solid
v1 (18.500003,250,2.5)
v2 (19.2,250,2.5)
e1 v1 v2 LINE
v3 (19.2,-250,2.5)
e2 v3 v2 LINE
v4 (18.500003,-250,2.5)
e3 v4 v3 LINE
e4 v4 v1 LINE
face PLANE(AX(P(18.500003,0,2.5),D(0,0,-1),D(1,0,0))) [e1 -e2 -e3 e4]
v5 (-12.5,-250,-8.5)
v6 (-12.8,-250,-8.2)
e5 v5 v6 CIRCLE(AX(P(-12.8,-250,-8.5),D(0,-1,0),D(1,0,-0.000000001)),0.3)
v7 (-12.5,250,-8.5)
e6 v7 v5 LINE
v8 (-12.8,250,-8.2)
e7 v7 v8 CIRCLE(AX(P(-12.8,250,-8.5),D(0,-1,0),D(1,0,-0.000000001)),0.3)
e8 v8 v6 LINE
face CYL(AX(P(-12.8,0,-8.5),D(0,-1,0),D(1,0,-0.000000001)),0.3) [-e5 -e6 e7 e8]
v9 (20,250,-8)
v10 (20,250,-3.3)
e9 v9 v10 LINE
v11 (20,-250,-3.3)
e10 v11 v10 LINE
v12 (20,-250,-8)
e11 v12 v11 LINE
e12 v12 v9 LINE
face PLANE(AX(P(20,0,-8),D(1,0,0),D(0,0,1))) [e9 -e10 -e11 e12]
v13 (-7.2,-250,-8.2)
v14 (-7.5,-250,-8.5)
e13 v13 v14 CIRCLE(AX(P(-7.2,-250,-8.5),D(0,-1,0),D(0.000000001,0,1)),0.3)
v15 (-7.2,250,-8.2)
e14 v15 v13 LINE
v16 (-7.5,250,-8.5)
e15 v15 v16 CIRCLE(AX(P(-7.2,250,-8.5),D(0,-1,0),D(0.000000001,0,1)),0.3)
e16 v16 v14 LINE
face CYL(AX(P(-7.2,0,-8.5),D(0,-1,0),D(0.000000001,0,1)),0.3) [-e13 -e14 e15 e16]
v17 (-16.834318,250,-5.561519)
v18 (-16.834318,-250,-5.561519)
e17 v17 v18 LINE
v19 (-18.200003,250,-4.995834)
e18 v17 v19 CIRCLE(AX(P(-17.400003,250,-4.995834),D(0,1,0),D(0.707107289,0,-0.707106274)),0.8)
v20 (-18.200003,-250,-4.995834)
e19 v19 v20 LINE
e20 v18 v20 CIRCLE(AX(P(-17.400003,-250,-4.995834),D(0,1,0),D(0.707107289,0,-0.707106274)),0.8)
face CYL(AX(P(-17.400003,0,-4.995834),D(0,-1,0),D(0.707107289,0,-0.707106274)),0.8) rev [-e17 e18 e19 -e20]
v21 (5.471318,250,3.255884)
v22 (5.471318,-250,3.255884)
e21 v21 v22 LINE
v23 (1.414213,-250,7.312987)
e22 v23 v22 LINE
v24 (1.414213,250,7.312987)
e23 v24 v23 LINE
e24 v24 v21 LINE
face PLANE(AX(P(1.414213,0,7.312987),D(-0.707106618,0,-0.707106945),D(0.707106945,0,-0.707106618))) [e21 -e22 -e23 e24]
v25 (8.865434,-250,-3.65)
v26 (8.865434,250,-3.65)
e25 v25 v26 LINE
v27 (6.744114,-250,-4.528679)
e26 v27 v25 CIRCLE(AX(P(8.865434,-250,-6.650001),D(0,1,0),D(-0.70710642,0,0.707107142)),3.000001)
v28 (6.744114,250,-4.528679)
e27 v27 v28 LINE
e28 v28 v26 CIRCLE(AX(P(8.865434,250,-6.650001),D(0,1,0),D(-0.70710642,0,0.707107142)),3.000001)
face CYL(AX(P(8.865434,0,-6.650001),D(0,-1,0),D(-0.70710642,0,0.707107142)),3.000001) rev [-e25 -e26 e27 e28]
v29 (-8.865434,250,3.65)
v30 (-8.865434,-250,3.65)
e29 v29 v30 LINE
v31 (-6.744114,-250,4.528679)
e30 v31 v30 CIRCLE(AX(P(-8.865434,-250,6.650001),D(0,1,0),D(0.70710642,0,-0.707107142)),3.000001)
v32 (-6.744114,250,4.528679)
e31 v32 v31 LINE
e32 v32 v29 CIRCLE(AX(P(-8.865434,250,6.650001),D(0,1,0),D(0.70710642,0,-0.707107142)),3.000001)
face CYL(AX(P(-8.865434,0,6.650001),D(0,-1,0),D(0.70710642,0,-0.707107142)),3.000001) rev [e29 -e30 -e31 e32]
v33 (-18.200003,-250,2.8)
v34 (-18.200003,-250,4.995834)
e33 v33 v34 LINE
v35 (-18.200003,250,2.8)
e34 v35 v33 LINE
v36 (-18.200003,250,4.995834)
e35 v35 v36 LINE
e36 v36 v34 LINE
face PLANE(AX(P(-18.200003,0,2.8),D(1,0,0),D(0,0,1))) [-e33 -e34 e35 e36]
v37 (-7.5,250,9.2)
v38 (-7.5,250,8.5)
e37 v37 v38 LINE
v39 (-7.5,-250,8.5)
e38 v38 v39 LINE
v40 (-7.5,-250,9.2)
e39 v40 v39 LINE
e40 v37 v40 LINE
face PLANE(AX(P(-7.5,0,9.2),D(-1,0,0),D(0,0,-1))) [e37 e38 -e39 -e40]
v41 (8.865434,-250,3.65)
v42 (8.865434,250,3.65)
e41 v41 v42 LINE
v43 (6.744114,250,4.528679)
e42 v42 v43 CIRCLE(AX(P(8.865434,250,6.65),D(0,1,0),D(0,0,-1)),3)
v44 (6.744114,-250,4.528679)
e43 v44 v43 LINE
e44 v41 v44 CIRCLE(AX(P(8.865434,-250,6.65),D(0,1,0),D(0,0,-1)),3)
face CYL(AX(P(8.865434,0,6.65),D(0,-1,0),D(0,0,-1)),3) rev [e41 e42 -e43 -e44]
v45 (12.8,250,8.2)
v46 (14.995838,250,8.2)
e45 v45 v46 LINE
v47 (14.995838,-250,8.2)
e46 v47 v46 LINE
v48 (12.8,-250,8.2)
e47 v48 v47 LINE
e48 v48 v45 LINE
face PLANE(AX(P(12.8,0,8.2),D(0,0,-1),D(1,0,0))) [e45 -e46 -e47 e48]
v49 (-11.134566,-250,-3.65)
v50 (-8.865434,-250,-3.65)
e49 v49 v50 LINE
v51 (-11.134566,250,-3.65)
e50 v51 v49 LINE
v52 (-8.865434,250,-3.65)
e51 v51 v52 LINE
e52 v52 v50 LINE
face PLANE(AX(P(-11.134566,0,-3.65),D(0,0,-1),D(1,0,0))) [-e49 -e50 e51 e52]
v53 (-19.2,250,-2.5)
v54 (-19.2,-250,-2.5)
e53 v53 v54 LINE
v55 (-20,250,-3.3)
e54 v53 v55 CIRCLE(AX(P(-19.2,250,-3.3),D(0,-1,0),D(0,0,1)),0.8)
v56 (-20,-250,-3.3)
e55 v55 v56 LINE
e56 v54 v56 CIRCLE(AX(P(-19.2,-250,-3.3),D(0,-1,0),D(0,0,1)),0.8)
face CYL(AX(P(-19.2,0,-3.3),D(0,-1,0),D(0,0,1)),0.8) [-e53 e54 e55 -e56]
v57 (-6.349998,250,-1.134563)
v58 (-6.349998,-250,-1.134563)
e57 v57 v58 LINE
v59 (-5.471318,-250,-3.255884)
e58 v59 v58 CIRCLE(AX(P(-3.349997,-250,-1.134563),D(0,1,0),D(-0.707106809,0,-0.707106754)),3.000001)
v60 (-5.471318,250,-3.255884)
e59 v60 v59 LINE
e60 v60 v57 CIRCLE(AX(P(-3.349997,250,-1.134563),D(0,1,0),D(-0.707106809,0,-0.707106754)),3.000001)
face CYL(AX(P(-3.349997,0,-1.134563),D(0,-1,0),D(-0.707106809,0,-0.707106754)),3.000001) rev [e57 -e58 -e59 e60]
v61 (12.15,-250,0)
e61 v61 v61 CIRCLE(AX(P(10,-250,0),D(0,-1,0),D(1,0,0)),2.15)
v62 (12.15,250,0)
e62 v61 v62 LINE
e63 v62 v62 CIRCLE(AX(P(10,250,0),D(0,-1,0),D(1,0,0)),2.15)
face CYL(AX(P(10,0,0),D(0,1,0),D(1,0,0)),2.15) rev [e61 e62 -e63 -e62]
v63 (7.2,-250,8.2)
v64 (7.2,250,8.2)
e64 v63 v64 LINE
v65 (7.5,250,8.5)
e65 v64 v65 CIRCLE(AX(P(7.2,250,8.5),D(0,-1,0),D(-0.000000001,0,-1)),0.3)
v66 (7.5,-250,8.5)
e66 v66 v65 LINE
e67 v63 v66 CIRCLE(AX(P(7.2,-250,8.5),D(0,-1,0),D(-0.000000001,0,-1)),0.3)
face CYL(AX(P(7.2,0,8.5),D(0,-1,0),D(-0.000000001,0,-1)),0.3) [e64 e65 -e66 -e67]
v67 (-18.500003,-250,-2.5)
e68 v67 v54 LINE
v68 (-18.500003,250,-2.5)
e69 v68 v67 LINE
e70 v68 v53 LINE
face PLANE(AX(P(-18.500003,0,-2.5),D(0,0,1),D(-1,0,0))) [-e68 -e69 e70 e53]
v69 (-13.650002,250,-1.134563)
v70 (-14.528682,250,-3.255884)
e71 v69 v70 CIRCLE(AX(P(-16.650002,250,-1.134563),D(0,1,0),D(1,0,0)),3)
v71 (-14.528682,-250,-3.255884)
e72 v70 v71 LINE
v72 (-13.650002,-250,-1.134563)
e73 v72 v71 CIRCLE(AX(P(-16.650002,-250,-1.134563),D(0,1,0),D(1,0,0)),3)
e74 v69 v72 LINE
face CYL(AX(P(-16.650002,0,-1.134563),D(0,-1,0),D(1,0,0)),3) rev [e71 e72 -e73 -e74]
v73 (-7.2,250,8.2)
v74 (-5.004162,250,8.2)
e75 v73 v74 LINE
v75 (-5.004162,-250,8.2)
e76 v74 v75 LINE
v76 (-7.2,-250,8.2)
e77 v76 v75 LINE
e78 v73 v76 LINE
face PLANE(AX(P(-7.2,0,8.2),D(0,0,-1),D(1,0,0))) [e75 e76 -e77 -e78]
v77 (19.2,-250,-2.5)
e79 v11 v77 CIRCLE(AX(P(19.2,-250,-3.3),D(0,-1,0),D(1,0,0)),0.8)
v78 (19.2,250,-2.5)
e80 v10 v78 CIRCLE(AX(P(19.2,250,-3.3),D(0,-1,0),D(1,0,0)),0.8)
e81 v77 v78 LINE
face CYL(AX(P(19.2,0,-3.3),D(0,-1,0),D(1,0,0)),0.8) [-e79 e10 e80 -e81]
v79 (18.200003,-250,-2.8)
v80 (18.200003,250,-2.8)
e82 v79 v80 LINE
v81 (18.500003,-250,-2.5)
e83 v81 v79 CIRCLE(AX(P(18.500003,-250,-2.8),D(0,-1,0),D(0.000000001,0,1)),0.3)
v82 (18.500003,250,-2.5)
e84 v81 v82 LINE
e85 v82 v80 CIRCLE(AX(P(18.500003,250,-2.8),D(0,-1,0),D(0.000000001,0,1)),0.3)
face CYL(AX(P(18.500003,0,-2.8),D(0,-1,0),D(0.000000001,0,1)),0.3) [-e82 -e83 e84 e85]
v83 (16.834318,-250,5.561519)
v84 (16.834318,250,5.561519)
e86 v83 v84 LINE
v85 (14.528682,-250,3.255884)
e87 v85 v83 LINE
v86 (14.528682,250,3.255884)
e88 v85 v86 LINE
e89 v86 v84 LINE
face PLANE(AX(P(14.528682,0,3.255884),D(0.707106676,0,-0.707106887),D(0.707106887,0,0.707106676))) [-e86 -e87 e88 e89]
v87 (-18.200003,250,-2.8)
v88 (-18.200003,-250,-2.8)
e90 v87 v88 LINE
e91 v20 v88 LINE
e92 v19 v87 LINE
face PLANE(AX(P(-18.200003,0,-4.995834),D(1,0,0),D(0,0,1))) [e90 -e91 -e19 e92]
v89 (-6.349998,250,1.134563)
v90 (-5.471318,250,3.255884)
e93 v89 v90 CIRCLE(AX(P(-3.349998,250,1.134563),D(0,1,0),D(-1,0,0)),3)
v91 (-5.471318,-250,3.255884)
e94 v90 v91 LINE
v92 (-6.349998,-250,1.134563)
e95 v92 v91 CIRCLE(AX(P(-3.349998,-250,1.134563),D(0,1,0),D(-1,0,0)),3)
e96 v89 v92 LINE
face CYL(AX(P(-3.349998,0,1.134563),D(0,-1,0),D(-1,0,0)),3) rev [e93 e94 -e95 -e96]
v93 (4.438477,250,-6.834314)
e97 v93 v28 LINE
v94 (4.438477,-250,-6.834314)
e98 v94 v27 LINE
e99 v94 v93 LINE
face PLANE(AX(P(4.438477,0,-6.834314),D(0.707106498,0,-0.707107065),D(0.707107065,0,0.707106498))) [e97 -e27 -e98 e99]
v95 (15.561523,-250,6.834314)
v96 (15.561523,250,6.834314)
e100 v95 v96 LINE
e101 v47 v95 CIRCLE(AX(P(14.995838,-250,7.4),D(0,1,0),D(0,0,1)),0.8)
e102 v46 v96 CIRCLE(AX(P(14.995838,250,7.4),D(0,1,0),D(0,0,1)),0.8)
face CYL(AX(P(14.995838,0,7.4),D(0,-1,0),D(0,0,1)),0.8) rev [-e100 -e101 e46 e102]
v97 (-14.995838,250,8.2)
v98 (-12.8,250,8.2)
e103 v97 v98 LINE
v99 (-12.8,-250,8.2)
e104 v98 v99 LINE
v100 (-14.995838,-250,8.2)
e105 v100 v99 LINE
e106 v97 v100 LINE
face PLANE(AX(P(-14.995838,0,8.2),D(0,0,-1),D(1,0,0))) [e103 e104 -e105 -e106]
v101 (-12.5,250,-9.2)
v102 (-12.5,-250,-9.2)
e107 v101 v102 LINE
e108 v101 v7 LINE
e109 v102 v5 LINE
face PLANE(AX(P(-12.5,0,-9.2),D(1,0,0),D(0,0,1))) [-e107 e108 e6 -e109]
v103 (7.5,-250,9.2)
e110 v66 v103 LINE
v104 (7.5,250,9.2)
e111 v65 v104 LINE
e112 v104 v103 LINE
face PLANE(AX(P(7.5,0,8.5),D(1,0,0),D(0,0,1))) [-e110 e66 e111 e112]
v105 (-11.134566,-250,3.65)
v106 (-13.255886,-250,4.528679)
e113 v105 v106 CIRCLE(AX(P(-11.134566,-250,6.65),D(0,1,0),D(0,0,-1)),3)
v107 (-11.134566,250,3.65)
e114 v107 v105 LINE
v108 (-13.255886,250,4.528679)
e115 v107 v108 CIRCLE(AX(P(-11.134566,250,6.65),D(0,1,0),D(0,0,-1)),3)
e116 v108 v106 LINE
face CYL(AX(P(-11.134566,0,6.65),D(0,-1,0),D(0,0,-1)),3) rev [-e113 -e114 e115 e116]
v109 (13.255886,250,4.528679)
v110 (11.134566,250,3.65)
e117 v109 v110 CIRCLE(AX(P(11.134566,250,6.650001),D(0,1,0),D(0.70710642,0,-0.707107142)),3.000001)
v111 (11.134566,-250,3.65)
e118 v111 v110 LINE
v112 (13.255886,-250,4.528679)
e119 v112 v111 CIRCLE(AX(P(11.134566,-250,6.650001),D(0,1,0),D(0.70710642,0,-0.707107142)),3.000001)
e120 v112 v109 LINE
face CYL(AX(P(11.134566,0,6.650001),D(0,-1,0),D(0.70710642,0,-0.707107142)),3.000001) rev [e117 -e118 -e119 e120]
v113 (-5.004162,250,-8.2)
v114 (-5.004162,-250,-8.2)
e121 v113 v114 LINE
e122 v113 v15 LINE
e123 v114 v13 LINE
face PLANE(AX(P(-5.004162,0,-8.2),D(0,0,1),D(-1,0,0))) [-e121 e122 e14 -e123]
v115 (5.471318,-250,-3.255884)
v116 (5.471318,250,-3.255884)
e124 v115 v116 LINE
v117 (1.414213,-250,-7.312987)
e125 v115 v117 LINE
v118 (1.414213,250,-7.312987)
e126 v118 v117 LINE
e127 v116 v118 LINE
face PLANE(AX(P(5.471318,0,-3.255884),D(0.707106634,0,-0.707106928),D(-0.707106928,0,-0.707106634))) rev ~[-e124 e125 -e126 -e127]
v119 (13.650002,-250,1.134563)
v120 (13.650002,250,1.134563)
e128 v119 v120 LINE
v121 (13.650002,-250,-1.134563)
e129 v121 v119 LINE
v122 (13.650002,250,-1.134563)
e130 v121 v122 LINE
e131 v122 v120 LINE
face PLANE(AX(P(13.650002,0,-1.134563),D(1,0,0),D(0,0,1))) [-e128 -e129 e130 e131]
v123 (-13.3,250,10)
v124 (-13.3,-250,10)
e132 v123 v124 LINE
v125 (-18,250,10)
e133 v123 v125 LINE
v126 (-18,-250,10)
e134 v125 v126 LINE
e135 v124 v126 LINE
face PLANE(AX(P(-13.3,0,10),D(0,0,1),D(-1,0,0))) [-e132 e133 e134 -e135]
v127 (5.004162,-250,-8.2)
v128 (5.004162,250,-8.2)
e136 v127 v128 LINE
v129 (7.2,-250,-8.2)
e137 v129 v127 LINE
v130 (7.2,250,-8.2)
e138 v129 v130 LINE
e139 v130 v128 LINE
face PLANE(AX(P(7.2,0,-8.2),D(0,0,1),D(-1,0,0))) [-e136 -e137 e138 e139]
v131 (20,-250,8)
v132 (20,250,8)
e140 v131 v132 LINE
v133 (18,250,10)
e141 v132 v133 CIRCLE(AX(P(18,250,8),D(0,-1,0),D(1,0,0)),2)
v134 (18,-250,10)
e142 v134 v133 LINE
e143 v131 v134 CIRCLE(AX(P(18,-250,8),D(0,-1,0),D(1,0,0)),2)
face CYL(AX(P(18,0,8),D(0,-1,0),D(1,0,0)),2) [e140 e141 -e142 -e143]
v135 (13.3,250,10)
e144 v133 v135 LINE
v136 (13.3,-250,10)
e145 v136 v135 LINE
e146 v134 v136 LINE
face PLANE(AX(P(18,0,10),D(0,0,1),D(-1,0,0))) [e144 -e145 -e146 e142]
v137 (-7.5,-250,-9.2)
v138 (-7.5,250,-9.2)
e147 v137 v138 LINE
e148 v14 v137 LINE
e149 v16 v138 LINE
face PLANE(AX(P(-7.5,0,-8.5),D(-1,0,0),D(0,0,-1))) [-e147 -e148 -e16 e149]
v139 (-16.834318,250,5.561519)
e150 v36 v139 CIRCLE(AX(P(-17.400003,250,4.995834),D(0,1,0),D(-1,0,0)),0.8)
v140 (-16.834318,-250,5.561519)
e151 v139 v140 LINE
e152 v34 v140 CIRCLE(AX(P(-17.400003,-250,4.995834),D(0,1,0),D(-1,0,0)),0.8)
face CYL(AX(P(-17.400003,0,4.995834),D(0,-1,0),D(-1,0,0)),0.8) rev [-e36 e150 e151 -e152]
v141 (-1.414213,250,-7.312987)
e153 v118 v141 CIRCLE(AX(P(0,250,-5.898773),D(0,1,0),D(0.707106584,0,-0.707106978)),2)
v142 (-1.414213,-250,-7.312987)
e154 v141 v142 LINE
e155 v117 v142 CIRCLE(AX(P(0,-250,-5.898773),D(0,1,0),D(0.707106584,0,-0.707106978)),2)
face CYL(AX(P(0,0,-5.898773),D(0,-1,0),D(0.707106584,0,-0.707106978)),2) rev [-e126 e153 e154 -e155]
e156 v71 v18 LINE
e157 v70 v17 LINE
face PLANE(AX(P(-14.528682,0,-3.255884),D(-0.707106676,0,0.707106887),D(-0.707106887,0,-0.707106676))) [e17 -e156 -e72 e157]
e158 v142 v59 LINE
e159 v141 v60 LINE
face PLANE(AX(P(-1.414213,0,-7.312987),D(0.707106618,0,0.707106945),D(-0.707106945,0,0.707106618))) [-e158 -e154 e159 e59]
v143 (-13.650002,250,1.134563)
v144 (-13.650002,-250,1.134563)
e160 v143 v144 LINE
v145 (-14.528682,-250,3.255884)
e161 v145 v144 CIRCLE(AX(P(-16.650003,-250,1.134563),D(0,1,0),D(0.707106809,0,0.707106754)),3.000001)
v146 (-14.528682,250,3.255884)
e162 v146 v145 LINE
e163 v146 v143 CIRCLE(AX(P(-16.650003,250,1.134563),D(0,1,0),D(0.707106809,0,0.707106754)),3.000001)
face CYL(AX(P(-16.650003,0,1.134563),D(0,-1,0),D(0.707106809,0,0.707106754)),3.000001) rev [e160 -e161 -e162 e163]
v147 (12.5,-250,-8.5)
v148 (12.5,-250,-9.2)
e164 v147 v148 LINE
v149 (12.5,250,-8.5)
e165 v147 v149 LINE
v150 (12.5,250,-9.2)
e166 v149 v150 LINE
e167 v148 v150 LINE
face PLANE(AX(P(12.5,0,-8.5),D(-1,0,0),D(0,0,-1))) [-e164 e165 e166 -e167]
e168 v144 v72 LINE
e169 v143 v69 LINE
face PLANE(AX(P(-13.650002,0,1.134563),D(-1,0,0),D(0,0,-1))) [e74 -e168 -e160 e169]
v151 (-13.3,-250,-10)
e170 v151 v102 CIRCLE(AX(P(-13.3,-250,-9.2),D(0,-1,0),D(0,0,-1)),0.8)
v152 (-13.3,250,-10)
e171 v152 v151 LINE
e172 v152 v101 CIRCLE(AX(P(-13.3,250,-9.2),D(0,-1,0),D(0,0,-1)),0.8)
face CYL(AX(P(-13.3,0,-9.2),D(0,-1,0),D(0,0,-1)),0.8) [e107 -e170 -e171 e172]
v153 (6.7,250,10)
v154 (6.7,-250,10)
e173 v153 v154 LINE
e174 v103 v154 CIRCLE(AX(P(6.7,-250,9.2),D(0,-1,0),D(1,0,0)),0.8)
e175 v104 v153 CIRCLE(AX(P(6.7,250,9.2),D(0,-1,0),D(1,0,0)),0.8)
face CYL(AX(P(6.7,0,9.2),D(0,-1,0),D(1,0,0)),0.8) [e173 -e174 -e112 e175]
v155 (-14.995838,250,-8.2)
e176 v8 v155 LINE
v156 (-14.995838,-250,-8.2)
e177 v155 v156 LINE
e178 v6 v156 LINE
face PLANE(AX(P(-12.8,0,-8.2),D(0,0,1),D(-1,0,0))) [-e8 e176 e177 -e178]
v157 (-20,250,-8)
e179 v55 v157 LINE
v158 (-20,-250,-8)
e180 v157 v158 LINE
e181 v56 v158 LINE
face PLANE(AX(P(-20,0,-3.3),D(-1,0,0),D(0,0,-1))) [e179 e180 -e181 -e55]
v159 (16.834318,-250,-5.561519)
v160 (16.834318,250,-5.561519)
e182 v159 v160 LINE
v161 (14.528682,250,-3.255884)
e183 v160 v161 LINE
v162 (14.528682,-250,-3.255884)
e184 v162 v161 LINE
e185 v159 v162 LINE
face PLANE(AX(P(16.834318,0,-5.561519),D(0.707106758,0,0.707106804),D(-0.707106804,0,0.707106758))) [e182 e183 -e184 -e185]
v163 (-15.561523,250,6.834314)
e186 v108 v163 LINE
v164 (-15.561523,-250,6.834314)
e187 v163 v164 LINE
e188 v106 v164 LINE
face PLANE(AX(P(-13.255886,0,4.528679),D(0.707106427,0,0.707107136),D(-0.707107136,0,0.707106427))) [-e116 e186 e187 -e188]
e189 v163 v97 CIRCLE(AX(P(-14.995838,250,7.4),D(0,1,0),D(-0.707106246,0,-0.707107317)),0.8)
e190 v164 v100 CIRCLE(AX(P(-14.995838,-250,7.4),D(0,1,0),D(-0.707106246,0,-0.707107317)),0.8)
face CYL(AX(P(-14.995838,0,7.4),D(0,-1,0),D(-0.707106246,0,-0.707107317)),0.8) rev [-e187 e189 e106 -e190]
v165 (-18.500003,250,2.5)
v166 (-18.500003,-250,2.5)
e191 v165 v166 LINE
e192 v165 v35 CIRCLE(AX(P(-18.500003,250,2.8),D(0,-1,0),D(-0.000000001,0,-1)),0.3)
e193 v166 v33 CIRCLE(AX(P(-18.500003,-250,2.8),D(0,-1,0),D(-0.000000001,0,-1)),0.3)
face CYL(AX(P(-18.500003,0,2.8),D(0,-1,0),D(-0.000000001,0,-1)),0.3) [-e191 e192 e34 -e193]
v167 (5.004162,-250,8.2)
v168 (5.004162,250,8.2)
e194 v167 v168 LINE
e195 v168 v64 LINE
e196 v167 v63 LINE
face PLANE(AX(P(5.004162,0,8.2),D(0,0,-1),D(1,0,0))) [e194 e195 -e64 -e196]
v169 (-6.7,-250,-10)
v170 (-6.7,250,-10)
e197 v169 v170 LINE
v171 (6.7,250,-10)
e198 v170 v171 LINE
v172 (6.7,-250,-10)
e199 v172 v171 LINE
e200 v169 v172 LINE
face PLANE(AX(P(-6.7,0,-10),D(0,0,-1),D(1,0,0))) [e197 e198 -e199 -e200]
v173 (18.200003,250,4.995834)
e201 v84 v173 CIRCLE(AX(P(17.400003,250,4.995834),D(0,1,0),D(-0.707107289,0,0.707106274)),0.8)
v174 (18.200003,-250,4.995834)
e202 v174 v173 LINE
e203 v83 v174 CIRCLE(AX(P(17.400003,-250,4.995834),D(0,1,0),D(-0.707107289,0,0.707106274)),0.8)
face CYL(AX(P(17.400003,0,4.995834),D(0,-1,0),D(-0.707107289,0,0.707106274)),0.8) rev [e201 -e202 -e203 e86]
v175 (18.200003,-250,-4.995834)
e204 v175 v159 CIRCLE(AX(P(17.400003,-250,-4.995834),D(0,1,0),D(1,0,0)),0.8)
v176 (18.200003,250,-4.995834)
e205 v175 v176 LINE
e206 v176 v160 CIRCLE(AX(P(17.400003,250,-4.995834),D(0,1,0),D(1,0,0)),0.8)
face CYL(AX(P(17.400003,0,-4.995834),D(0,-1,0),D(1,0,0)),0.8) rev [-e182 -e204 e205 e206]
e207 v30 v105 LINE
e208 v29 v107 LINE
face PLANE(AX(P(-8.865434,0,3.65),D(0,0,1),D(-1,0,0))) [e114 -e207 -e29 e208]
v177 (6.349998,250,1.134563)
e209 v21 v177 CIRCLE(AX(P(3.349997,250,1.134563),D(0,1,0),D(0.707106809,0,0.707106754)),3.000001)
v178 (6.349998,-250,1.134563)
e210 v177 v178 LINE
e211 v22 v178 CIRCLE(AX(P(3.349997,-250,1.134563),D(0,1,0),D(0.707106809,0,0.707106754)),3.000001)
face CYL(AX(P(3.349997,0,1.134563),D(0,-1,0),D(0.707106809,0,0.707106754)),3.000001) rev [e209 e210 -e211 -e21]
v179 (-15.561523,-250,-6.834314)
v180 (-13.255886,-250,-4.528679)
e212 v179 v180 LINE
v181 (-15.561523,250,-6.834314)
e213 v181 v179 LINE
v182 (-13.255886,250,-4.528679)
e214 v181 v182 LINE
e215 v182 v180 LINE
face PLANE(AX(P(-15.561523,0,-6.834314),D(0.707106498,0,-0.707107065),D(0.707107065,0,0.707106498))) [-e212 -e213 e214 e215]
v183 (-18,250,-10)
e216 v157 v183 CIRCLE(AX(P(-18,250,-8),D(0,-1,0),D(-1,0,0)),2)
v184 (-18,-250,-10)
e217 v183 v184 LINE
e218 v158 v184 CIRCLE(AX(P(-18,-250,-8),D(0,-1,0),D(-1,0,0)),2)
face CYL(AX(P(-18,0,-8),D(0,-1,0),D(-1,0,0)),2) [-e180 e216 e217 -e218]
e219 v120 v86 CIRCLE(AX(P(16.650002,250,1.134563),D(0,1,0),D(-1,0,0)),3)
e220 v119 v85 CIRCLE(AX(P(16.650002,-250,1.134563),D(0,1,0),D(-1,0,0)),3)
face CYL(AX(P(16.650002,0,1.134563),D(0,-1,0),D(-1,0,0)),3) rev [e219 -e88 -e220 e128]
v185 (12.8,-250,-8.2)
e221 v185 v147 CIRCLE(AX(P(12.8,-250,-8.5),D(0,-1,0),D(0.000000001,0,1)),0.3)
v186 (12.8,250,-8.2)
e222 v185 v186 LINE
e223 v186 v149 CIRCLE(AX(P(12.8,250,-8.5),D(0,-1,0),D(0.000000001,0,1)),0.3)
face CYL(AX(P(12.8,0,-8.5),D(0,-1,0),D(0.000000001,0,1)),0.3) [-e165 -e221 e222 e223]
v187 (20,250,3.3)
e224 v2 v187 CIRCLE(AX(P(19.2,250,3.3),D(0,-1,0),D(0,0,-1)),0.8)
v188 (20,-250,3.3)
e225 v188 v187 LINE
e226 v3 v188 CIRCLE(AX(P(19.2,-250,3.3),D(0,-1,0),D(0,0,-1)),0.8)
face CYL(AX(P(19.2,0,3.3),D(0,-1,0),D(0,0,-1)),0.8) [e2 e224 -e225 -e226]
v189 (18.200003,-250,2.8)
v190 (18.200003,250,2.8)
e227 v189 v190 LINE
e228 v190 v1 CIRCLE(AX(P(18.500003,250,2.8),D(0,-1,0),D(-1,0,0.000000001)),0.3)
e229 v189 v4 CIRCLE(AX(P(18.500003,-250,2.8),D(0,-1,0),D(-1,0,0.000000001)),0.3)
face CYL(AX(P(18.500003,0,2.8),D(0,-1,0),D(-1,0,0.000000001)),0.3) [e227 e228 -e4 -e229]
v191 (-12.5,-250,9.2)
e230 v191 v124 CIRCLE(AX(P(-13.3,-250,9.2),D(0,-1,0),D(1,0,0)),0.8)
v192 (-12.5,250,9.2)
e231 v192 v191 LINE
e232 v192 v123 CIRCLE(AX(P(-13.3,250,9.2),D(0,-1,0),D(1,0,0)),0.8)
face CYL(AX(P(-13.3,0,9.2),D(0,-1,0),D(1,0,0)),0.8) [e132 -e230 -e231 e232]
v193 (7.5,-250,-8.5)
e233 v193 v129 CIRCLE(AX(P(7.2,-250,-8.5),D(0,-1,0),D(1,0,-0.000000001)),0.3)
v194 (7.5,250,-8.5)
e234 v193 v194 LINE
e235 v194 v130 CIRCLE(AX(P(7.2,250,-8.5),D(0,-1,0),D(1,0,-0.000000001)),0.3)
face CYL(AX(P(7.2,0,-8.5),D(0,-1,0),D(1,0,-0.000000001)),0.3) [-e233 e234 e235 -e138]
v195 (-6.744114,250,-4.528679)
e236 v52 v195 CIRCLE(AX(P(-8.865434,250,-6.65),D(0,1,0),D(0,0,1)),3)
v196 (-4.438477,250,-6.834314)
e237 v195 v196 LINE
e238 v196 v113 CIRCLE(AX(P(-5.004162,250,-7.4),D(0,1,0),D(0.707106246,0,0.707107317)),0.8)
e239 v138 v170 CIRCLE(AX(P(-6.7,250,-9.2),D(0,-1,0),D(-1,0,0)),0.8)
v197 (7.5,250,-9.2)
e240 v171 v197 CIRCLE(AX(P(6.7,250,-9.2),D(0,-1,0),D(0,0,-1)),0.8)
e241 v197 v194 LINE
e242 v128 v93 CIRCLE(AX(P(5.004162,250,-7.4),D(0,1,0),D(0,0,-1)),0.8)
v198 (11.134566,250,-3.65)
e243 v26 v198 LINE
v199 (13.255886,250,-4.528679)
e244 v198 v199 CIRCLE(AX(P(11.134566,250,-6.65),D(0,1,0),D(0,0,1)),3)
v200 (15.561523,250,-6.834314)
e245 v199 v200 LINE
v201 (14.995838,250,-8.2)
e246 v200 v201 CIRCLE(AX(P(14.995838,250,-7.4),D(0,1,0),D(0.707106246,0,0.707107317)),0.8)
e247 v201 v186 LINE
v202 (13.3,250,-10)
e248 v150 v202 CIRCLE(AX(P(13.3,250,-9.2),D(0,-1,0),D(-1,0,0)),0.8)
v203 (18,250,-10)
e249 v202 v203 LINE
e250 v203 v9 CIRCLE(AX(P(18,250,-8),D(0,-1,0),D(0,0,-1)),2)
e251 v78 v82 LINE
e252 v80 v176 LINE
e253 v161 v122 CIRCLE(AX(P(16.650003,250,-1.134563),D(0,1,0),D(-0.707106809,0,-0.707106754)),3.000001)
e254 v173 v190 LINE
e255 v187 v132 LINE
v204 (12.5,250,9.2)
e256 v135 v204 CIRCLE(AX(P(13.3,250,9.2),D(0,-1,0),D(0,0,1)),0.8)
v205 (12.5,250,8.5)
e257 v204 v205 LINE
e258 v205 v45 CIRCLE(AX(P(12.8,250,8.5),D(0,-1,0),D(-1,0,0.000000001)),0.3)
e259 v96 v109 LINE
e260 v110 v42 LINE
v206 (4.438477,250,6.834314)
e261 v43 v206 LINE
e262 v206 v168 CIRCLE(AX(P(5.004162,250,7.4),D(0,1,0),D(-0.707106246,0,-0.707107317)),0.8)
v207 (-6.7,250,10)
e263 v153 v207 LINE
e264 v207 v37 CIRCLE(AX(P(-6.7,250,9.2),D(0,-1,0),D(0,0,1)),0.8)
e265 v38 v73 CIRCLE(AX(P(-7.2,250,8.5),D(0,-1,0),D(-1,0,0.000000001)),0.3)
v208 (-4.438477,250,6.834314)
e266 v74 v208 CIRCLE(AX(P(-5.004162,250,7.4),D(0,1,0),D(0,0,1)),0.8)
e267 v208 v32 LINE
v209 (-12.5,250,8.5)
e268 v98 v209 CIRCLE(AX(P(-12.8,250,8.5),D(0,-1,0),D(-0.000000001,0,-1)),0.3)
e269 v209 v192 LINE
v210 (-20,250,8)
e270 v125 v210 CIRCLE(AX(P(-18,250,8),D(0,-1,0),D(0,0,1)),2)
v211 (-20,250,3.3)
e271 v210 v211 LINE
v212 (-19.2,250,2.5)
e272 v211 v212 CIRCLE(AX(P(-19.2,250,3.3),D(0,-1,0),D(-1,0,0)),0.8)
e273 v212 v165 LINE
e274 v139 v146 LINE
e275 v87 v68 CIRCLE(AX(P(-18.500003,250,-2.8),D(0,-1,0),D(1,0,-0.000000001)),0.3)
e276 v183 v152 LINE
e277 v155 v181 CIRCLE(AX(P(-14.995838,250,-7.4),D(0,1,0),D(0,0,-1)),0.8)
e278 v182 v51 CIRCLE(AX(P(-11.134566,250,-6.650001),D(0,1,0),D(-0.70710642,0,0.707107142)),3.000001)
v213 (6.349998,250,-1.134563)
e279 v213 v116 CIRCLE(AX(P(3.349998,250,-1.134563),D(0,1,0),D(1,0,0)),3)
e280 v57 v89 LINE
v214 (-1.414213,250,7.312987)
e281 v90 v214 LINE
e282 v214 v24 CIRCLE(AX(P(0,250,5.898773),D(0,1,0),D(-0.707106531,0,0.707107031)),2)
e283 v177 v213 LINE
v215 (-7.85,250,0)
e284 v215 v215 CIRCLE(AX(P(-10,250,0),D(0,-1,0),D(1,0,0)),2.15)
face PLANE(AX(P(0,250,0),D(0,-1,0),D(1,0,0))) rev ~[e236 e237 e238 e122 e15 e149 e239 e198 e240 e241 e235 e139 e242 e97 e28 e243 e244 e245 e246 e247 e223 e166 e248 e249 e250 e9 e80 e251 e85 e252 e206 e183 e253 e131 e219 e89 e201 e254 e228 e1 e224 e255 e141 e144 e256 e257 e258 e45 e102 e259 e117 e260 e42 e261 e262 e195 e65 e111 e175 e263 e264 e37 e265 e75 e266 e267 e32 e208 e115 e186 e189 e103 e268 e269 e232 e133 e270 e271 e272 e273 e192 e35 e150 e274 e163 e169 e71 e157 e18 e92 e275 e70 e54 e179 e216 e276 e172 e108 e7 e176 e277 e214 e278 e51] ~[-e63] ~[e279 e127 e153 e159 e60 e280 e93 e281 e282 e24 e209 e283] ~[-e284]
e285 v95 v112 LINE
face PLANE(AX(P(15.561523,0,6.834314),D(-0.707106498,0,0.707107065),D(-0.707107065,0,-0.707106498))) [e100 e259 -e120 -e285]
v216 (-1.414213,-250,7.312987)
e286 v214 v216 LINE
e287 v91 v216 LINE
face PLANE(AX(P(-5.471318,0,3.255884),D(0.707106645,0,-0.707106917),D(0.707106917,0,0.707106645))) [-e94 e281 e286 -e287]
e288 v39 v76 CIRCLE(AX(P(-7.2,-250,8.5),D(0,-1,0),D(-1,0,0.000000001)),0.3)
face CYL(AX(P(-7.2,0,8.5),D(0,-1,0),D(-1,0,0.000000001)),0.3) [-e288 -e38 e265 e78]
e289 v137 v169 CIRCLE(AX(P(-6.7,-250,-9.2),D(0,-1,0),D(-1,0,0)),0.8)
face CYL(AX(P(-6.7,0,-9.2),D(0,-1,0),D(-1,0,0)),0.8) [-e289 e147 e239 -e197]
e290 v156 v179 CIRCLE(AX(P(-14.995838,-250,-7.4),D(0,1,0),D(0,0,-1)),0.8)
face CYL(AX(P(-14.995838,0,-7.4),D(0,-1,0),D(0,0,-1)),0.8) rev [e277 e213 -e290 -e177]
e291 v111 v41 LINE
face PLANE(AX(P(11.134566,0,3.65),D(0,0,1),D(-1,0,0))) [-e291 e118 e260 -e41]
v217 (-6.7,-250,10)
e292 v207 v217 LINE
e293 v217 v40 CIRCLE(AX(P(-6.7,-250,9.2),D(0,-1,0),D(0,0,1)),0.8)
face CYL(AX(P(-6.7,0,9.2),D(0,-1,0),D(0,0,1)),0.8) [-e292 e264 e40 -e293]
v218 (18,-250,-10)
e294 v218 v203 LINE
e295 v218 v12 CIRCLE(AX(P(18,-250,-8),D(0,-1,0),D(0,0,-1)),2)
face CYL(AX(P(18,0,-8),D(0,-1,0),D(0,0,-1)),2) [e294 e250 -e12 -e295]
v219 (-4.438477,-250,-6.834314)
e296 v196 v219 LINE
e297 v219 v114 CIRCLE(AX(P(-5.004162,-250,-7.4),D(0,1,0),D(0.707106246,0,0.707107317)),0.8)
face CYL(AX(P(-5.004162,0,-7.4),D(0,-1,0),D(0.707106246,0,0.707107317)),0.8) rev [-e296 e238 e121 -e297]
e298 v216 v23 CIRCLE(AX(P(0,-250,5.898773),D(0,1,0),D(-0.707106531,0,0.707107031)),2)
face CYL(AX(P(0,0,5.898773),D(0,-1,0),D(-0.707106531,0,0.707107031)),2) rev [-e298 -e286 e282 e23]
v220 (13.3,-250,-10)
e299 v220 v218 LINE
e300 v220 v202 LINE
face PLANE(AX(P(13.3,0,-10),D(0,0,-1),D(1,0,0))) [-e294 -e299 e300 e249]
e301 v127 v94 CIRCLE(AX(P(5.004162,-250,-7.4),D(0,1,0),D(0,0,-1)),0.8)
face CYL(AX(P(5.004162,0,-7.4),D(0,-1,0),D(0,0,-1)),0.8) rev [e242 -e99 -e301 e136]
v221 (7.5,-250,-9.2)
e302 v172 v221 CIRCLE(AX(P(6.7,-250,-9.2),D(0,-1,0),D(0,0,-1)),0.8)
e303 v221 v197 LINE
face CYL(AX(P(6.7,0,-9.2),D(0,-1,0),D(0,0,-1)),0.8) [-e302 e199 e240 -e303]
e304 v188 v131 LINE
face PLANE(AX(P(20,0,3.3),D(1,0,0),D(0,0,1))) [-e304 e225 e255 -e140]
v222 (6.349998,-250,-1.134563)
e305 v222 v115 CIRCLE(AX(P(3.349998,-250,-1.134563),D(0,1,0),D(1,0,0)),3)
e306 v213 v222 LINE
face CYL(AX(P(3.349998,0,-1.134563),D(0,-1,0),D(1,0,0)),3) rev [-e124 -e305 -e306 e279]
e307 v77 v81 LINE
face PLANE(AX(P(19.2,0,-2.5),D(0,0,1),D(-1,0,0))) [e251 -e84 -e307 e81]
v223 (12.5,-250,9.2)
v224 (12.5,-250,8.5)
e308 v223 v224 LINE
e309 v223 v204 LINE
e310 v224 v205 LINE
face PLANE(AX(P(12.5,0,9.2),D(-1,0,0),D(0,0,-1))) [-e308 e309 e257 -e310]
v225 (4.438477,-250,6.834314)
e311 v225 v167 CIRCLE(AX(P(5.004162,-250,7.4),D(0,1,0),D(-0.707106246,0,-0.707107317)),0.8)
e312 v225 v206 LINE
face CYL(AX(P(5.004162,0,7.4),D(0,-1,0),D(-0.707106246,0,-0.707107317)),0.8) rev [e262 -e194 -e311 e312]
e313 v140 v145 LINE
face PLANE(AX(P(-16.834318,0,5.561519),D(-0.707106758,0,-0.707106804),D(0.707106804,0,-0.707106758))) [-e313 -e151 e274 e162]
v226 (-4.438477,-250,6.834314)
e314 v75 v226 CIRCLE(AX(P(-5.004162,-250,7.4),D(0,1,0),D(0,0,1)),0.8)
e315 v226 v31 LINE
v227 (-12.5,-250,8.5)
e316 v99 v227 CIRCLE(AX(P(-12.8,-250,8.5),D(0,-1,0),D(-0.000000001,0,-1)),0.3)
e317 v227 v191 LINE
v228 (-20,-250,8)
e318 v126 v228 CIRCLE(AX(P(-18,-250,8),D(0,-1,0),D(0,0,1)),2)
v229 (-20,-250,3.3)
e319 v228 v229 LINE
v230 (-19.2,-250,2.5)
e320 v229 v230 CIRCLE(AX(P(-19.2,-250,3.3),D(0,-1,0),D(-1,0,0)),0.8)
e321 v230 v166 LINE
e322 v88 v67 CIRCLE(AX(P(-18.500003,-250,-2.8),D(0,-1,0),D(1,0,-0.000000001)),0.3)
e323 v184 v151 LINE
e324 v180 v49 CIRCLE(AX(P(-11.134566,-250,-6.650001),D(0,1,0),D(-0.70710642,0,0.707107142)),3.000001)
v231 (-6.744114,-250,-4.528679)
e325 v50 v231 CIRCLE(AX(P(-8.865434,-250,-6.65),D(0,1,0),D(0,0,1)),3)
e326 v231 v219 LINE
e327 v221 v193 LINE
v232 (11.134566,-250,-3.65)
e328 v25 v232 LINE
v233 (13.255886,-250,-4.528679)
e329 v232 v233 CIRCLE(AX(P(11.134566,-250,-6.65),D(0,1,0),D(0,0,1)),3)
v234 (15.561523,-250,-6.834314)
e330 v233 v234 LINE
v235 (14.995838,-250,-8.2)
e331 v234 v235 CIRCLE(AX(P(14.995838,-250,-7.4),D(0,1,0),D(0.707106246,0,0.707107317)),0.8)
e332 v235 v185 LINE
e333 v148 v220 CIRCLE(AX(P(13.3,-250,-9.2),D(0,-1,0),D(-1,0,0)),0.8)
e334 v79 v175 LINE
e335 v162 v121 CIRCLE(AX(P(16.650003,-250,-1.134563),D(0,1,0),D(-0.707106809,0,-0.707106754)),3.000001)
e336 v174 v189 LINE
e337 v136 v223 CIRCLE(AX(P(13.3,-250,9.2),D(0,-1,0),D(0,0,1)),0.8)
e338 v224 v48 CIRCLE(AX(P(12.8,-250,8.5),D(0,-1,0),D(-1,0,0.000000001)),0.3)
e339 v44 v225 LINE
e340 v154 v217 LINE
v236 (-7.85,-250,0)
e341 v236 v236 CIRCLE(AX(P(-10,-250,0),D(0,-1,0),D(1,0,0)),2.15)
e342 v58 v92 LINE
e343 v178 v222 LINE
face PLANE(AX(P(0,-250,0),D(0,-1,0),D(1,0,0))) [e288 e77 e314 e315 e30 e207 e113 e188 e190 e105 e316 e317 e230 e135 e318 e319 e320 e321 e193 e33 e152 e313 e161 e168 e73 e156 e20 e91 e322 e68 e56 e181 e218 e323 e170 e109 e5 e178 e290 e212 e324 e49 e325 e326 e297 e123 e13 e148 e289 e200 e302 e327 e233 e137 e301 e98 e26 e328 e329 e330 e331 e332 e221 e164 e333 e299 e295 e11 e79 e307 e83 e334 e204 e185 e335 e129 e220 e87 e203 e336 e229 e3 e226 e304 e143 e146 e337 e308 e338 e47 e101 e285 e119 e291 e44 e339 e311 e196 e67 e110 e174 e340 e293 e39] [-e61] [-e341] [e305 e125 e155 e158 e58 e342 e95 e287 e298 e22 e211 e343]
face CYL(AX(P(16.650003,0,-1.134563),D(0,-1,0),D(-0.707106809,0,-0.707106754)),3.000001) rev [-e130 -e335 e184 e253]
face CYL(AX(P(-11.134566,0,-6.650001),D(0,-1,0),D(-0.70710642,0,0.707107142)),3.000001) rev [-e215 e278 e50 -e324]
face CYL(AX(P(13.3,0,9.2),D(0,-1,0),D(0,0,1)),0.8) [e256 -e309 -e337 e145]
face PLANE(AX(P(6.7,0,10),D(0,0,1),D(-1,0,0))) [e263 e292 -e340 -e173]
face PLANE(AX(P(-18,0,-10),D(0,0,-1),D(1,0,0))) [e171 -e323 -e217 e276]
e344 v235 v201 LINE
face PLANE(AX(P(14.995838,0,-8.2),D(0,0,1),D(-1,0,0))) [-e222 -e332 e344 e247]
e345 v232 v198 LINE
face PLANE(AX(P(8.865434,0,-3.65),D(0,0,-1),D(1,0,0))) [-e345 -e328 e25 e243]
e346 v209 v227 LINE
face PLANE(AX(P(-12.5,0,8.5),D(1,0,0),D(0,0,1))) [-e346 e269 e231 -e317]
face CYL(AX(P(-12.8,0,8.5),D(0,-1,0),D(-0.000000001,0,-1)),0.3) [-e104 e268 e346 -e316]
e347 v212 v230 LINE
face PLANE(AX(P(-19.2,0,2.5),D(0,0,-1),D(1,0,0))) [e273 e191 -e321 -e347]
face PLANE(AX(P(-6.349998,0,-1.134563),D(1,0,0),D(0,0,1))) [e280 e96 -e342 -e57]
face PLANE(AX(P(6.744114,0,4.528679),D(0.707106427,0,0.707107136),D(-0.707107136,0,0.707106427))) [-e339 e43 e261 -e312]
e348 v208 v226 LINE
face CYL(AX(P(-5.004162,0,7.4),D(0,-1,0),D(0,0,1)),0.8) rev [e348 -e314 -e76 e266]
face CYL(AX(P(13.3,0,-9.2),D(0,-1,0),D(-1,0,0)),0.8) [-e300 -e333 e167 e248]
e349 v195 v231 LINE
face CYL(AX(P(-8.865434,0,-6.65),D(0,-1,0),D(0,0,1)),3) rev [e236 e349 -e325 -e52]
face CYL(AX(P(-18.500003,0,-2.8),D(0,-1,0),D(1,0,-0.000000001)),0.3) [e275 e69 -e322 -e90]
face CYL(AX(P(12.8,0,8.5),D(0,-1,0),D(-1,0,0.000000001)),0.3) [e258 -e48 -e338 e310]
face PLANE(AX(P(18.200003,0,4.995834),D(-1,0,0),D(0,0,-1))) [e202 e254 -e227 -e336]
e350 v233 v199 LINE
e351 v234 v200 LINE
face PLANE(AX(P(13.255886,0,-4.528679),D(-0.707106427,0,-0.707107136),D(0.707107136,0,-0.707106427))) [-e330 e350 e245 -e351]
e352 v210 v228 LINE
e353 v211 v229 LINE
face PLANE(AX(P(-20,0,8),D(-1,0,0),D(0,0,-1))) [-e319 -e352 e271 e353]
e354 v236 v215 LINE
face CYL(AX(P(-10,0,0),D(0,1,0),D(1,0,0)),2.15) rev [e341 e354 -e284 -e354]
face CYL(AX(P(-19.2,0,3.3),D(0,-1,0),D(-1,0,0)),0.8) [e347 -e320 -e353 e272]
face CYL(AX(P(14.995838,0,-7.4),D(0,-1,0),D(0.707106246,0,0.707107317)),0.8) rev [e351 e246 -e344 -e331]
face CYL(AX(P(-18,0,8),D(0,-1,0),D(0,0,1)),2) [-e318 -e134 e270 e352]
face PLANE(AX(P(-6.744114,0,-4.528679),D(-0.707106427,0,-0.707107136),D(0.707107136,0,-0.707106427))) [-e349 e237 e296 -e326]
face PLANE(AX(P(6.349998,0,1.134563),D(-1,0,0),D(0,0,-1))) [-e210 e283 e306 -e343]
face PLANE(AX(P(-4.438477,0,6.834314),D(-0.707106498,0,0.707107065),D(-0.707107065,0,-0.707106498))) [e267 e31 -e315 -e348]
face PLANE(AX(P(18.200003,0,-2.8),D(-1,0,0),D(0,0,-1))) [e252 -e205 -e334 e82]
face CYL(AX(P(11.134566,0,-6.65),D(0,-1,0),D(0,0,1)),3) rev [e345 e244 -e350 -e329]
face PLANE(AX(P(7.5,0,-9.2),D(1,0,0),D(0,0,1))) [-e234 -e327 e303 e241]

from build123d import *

# Parameters (mm, degrees)
F0_R     = 2.15
F1_DEPTH = 250


# Not quite as in the source:
# - ends of sketch curves that miss each other by under 0.0002 mm in the source are joined


with BuildPart() as f1:
    # F0 (on Front) → F1 (new body, symmetric)
    with BuildSketch(Plane.XZ):
        with BuildLine():
            Line((7.5, 8.5), (7.5, 9.2))
            ThreePointArc((7.5, 9.2), (7.2656854249, 9.7656854249), (6.7, 10))
            Line((6.7, 10), (-6.7, 10))
            ThreePointArc((-6.7, 10), (-7.2656854249, 9.7656854249), (-7.5, 9.2))
            Line((-7.5, 9.2), (-7.5, 8.5))
            ThreePointArc((-7.5, 8.5), (-7.4121320344, 8.2878679656), (-7.2, 8.2))
            Line((-7.2, 8.2), (-5.004162, 8.2))
            ThreePointArc((-5.004162, 8.2), (-4.2650582387, 7.7061464193), (-4.4384770751, 6.8343140751))
            Line((-4.4384770751, 6.8343140751), (-6.744114, 4.528679))
            ThreePointArc((-6.744114, 4.528679), (-7.7173840295, 3.8783612672), (-8.865434, 3.65))
            Line((-8.865434, 3.65), (-11.134566, 3.65))
            ThreePointArc((-11.134566, 3.65), (-12.2826159705, 3.8783612672), (-13.2558858436, 4.5286791564))
            Line((-13.2558858436, 4.5286791564), (-15.561523, 6.834314))
            ThreePointArc((-15.561523, 6.834314), (-15.7349417613, 7.7061464193), (-14.995838, 8.2))
            Line((-14.995838, 8.2), (-12.8, 8.2))
            ThreePointArc((-12.8, 8.2), (-12.5878679656, 8.2878679656), (-12.5, 8.5))
            Line((-12.5, 8.5), (-12.5, 9.2))
            ThreePointArc((-12.5, 9.2), (-12.7343145751, 9.7656854249), (-13.3, 10))
            Line((-13.3, 10), (-18, 10))
            ThreePointArc((-18, 10), (-19.4142135624, 9.4142135624), (-20, 8))
            Line((-20, 8), (-20, 3.3))
            ThreePointArc((-20, 3.3), (-19.7656854249, 2.7343145751), (-19.2, 2.5))
            Line((-19.2, 2.5), (-18.500003, 2.5))
            ThreePointArc((-18.500003, 2.5), (-18.2878709656, 2.5878679656), (-18.200003, 2.8))
            Line((-18.200003, 2.8), (-18.200003, 4.995834))
            ThreePointArc((-18.200003, 4.995834), (-17.7061497459, 5.734937626), (-16.8343175751, 5.5615194249))
            Line((-16.8343175751, 5.5615194249), (-14.528682, 3.255884))
            ThreePointArc((-14.528682, 3.255884), (-13.8783635378, 2.2826136237), (-13.650002, 1.134563))
            Line((-13.650002, 1.134563), (-13.650002, -1.134563))
            ThreePointArc((-13.650002, -1.134563), (-13.8783635378, -2.2826136237), (-14.5286821564, -3.2558838436))
            Line((-14.5286821564, -3.2558838436), (-16.834318, -5.561519))
            ThreePointArc((-16.834318, -5.561519), (-17.7061497459, -5.734937626), (-18.200003, -4.995834))
            Line((-18.200003, -4.995834), (-18.200003, -2.8))
            ThreePointArc((-18.200003, -2.8), (-18.2878709656, -2.5878679656), (-18.500003, -2.5))
            Line((-18.500003, -2.5), (-19.2, -2.5))
            ThreePointArc((-19.2, -2.5), (-19.7656854249, -2.7343145751), (-20, -3.3))
            Line((-20, -3.3), (-20, -8))
            ThreePointArc((-20, -8), (-19.4142135624, -9.4142135624), (-18, -10))
            Line((-18, -10), (-13.3, -10))
            ThreePointArc((-13.3, -10), (-12.7343145751, -9.7656854249), (-12.5, -9.2))
            Line((-12.5, -9.2), (-12.5, -8.5))
            ThreePointArc((-12.5, -8.5), (-12.5878679656, -8.2878679656), (-12.8, -8.2))
            Line((-12.8, -8.2), (-14.995838, -8.2))
            ThreePointArc((-14.995838, -8.2), (-15.7349417613, -7.7061464193), (-15.5615229249, -6.8343140751))
            Line((-15.5615229249, -6.8343140751), (-13.255886, -4.528679))
            ThreePointArc((-13.255886, -4.528679), (-12.2826159705, -3.8783612672), (-11.134566, -3.65))
            Line((-11.134566, -3.65), (-8.865434, -3.65))
            ThreePointArc((-8.865434, -3.65), (-7.7173840295, -3.8783612672), (-6.7441141564, -4.5286791564))
            Line((-6.7441141564, -4.5286791564), (-4.438477, -6.834314))
            ThreePointArc((-4.438477, -6.834314), (-4.2650582387, -7.7061464193), (-5.004162, -8.2))
            Line((-5.004162, -8.2), (-7.2, -8.2))
            ThreePointArc((-7.2, -8.2), (-7.4121320344, -8.2878679656), (-7.5, -8.5))
            Line((-7.5, -8.5), (-7.5, -9.2))
            ThreePointArc((-7.5, -9.2), (-7.2656854249, -9.7656854249), (-6.7, -10))
            Line((-6.7, -10), (6.7, -10))
            ThreePointArc((6.7, -10), (7.2656854249, -9.7656854249), (7.5, -9.2))
            Line((7.5, -9.2), (7.5, -8.5))
            ThreePointArc((7.5, -8.5), (7.4121320344, -8.2878679656), (7.2, -8.2))
            Line((7.2, -8.2), (5.004162, -8.2))
            ThreePointArc((5.004162, -8.2), (4.2650582387, -7.7061464193), (4.4384770751, -6.8343140751))
            Line((4.4384770751, -6.8343140751), (6.744114, -4.528679))
            ThreePointArc((6.744114, -4.528679), (7.7173840295, -3.8783612672), (8.865434, -3.65))
            Line((8.865434, -3.65), (11.134566, -3.65))
            ThreePointArc((11.134566, -3.65), (12.2826159705, -3.8783612672), (13.2558858436, -4.5286791564))
            Line((13.2558858436, -4.5286791564), (15.561523, -6.834314))
            ThreePointArc((15.561523, -6.834314), (15.7349417613, -7.7061464193), (14.995838, -8.2))
            Line((14.995838, -8.2), (12.8, -8.2))
            ThreePointArc((12.8, -8.2), (12.5878679656, -8.2878679656), (12.5, -8.5))
            Line((12.5, -8.5), (12.5, -9.2))
            ThreePointArc((12.5, -9.2), (12.7343145751, -9.7656854249), (13.3, -10))
            Line((13.3, -10), (18, -10))
            ThreePointArc((18, -10), (19.4142135624, -9.4142135624), (20, -8))
            Line((20, -8), (20, -3.3))
            ThreePointArc((20, -3.3), (19.7656854249, -2.7343145751), (19.2, -2.5))
            Line((19.2, -2.5), (18.500003, -2.5))
            ThreePointArc((18.500003, -2.5), (18.2878709656, -2.5878679656), (18.200003, -2.8))
            Line((18.200003, -2.8), (18.200003, -4.995834))
            ThreePointArc((18.200003, -4.995834), (17.7061497459, -5.734937626), (16.8343175751, -5.5615194249))
            Line((16.8343175751, -5.5615194249), (14.528682, -3.255884))
            ThreePointArc((14.528682, -3.255884), (13.8783635378, -2.2826136237), (13.650002, -1.134563))
            Line((13.650002, -1.134563), (13.650002, 1.134563))
            ThreePointArc((13.650002, 1.134563), (13.8783635378, 2.2826136237), (14.5286821564, 3.2558838436))
            Line((14.5286821564, 3.2558838436), (16.834318, 5.561519))
            ThreePointArc((16.834318, 5.561519), (17.7061497459, 5.734937626), (18.200003, 4.995834))
            Line((18.200003, 4.995834), (18.200003, 2.8))
            ThreePointArc((18.200003, 2.8), (18.2878709656, 2.5878679656), (18.500003, 2.5))
            Line((18.500003, 2.5), (19.2, 2.5))
            ThreePointArc((19.2, 2.5), (19.7656854249, 2.7343145751), (20, 3.3))
            Line((20, 3.3), (20, 8))
            ThreePointArc((20, 8), (19.4142135624, 9.4142135624), (18, 10))
            Line((18, 10), (13.3, 10))
            ThreePointArc((13.3, 10), (12.7343145751, 9.7656854249), (12.5, 9.2))
            Line((12.5, 9.2), (12.5, 8.5))
            ThreePointArc((12.5, 8.5), (12.5878679656, 8.2878679656), (12.8, 8.2))
            Line((12.8, 8.2), (14.995838, 8.2))
            ThreePointArc((14.995838, 8.2), (15.7349417613, 7.7061464193), (15.5615229249, 6.8343140751))
            Line((15.5615229249, 6.8343140751), (13.255886, 4.528679))
            ThreePointArc((13.255886, 4.528679), (12.2826159705, 3.8783612672), (11.134566, 3.65))
            Line((11.134566, 3.65), (8.865434, 3.65))
            ThreePointArc((8.865434, 3.65), (7.7173840295, 3.8783612672), (6.7441141564, 4.5286791564))
            Line((6.7441141564, 4.5286791564), (4.438477, 6.834314))
            ThreePointArc((4.438477, 6.834314), (4.2650582387, 7.7061464193), (5.004162, 8.2))
            Line((5.004162, 8.2), (7.2, 8.2))
            ThreePointArc((7.2, 8.2), (7.4121320344, 8.2878679656), (7.5, 8.5))
        make_face()
        with Locations((-10, 0)):
            Circle(F0_R, mode=Mode.SUBTRACT)
        with BuildLine():
            ThreePointArc((-1.4142130624, 7.3129870624), (0, 7.898773), (1.4142130624, 7.3129870624))
            Line((1.4142130624, 7.3129870624), (5.471318, 3.255884))
            ThreePointArc((5.471318, 3.255884), (6.1216364622, 2.2826136237), (6.349998, 1.134563))
            Line((6.349998, 1.134563), (6.349998, -1.134563))
            ThreePointArc((6.349998, -1.134563), (6.1216364622, -2.2826136237), (5.4713178436, -3.2558838436))
            Line((5.4713178436, -3.2558838436), (1.414213, -7.312987))
            ThreePointArc((1.414213, -7.312987), (0, -7.898773), (-1.4142130624, -7.3129870624))
            Line((-1.4142130624, -7.3129870624), (-5.471318, -3.255884))
            ThreePointArc((-5.471318, -3.255884), (-6.1216364622, -2.2826136237), (-6.349998, -1.134563))
            Line((-6.349998, -1.134563), (-6.349998, 1.134563))
            ThreePointArc((-6.349998, 1.134563), (-6.1216364622, 2.2826136237), (-5.4713178436, 3.2558838436))
            Line((-5.4713178436, 3.2558838436), (-1.4142130624, 7.3129870624))
        make_face(mode=Mode.SUBTRACT)
        with Locations((10, 0)):
            Circle(F0_R, mode=Mode.SUBTRACT)
    extrude(amount=F1_DEPTH, both=True)


solid = f1.part
